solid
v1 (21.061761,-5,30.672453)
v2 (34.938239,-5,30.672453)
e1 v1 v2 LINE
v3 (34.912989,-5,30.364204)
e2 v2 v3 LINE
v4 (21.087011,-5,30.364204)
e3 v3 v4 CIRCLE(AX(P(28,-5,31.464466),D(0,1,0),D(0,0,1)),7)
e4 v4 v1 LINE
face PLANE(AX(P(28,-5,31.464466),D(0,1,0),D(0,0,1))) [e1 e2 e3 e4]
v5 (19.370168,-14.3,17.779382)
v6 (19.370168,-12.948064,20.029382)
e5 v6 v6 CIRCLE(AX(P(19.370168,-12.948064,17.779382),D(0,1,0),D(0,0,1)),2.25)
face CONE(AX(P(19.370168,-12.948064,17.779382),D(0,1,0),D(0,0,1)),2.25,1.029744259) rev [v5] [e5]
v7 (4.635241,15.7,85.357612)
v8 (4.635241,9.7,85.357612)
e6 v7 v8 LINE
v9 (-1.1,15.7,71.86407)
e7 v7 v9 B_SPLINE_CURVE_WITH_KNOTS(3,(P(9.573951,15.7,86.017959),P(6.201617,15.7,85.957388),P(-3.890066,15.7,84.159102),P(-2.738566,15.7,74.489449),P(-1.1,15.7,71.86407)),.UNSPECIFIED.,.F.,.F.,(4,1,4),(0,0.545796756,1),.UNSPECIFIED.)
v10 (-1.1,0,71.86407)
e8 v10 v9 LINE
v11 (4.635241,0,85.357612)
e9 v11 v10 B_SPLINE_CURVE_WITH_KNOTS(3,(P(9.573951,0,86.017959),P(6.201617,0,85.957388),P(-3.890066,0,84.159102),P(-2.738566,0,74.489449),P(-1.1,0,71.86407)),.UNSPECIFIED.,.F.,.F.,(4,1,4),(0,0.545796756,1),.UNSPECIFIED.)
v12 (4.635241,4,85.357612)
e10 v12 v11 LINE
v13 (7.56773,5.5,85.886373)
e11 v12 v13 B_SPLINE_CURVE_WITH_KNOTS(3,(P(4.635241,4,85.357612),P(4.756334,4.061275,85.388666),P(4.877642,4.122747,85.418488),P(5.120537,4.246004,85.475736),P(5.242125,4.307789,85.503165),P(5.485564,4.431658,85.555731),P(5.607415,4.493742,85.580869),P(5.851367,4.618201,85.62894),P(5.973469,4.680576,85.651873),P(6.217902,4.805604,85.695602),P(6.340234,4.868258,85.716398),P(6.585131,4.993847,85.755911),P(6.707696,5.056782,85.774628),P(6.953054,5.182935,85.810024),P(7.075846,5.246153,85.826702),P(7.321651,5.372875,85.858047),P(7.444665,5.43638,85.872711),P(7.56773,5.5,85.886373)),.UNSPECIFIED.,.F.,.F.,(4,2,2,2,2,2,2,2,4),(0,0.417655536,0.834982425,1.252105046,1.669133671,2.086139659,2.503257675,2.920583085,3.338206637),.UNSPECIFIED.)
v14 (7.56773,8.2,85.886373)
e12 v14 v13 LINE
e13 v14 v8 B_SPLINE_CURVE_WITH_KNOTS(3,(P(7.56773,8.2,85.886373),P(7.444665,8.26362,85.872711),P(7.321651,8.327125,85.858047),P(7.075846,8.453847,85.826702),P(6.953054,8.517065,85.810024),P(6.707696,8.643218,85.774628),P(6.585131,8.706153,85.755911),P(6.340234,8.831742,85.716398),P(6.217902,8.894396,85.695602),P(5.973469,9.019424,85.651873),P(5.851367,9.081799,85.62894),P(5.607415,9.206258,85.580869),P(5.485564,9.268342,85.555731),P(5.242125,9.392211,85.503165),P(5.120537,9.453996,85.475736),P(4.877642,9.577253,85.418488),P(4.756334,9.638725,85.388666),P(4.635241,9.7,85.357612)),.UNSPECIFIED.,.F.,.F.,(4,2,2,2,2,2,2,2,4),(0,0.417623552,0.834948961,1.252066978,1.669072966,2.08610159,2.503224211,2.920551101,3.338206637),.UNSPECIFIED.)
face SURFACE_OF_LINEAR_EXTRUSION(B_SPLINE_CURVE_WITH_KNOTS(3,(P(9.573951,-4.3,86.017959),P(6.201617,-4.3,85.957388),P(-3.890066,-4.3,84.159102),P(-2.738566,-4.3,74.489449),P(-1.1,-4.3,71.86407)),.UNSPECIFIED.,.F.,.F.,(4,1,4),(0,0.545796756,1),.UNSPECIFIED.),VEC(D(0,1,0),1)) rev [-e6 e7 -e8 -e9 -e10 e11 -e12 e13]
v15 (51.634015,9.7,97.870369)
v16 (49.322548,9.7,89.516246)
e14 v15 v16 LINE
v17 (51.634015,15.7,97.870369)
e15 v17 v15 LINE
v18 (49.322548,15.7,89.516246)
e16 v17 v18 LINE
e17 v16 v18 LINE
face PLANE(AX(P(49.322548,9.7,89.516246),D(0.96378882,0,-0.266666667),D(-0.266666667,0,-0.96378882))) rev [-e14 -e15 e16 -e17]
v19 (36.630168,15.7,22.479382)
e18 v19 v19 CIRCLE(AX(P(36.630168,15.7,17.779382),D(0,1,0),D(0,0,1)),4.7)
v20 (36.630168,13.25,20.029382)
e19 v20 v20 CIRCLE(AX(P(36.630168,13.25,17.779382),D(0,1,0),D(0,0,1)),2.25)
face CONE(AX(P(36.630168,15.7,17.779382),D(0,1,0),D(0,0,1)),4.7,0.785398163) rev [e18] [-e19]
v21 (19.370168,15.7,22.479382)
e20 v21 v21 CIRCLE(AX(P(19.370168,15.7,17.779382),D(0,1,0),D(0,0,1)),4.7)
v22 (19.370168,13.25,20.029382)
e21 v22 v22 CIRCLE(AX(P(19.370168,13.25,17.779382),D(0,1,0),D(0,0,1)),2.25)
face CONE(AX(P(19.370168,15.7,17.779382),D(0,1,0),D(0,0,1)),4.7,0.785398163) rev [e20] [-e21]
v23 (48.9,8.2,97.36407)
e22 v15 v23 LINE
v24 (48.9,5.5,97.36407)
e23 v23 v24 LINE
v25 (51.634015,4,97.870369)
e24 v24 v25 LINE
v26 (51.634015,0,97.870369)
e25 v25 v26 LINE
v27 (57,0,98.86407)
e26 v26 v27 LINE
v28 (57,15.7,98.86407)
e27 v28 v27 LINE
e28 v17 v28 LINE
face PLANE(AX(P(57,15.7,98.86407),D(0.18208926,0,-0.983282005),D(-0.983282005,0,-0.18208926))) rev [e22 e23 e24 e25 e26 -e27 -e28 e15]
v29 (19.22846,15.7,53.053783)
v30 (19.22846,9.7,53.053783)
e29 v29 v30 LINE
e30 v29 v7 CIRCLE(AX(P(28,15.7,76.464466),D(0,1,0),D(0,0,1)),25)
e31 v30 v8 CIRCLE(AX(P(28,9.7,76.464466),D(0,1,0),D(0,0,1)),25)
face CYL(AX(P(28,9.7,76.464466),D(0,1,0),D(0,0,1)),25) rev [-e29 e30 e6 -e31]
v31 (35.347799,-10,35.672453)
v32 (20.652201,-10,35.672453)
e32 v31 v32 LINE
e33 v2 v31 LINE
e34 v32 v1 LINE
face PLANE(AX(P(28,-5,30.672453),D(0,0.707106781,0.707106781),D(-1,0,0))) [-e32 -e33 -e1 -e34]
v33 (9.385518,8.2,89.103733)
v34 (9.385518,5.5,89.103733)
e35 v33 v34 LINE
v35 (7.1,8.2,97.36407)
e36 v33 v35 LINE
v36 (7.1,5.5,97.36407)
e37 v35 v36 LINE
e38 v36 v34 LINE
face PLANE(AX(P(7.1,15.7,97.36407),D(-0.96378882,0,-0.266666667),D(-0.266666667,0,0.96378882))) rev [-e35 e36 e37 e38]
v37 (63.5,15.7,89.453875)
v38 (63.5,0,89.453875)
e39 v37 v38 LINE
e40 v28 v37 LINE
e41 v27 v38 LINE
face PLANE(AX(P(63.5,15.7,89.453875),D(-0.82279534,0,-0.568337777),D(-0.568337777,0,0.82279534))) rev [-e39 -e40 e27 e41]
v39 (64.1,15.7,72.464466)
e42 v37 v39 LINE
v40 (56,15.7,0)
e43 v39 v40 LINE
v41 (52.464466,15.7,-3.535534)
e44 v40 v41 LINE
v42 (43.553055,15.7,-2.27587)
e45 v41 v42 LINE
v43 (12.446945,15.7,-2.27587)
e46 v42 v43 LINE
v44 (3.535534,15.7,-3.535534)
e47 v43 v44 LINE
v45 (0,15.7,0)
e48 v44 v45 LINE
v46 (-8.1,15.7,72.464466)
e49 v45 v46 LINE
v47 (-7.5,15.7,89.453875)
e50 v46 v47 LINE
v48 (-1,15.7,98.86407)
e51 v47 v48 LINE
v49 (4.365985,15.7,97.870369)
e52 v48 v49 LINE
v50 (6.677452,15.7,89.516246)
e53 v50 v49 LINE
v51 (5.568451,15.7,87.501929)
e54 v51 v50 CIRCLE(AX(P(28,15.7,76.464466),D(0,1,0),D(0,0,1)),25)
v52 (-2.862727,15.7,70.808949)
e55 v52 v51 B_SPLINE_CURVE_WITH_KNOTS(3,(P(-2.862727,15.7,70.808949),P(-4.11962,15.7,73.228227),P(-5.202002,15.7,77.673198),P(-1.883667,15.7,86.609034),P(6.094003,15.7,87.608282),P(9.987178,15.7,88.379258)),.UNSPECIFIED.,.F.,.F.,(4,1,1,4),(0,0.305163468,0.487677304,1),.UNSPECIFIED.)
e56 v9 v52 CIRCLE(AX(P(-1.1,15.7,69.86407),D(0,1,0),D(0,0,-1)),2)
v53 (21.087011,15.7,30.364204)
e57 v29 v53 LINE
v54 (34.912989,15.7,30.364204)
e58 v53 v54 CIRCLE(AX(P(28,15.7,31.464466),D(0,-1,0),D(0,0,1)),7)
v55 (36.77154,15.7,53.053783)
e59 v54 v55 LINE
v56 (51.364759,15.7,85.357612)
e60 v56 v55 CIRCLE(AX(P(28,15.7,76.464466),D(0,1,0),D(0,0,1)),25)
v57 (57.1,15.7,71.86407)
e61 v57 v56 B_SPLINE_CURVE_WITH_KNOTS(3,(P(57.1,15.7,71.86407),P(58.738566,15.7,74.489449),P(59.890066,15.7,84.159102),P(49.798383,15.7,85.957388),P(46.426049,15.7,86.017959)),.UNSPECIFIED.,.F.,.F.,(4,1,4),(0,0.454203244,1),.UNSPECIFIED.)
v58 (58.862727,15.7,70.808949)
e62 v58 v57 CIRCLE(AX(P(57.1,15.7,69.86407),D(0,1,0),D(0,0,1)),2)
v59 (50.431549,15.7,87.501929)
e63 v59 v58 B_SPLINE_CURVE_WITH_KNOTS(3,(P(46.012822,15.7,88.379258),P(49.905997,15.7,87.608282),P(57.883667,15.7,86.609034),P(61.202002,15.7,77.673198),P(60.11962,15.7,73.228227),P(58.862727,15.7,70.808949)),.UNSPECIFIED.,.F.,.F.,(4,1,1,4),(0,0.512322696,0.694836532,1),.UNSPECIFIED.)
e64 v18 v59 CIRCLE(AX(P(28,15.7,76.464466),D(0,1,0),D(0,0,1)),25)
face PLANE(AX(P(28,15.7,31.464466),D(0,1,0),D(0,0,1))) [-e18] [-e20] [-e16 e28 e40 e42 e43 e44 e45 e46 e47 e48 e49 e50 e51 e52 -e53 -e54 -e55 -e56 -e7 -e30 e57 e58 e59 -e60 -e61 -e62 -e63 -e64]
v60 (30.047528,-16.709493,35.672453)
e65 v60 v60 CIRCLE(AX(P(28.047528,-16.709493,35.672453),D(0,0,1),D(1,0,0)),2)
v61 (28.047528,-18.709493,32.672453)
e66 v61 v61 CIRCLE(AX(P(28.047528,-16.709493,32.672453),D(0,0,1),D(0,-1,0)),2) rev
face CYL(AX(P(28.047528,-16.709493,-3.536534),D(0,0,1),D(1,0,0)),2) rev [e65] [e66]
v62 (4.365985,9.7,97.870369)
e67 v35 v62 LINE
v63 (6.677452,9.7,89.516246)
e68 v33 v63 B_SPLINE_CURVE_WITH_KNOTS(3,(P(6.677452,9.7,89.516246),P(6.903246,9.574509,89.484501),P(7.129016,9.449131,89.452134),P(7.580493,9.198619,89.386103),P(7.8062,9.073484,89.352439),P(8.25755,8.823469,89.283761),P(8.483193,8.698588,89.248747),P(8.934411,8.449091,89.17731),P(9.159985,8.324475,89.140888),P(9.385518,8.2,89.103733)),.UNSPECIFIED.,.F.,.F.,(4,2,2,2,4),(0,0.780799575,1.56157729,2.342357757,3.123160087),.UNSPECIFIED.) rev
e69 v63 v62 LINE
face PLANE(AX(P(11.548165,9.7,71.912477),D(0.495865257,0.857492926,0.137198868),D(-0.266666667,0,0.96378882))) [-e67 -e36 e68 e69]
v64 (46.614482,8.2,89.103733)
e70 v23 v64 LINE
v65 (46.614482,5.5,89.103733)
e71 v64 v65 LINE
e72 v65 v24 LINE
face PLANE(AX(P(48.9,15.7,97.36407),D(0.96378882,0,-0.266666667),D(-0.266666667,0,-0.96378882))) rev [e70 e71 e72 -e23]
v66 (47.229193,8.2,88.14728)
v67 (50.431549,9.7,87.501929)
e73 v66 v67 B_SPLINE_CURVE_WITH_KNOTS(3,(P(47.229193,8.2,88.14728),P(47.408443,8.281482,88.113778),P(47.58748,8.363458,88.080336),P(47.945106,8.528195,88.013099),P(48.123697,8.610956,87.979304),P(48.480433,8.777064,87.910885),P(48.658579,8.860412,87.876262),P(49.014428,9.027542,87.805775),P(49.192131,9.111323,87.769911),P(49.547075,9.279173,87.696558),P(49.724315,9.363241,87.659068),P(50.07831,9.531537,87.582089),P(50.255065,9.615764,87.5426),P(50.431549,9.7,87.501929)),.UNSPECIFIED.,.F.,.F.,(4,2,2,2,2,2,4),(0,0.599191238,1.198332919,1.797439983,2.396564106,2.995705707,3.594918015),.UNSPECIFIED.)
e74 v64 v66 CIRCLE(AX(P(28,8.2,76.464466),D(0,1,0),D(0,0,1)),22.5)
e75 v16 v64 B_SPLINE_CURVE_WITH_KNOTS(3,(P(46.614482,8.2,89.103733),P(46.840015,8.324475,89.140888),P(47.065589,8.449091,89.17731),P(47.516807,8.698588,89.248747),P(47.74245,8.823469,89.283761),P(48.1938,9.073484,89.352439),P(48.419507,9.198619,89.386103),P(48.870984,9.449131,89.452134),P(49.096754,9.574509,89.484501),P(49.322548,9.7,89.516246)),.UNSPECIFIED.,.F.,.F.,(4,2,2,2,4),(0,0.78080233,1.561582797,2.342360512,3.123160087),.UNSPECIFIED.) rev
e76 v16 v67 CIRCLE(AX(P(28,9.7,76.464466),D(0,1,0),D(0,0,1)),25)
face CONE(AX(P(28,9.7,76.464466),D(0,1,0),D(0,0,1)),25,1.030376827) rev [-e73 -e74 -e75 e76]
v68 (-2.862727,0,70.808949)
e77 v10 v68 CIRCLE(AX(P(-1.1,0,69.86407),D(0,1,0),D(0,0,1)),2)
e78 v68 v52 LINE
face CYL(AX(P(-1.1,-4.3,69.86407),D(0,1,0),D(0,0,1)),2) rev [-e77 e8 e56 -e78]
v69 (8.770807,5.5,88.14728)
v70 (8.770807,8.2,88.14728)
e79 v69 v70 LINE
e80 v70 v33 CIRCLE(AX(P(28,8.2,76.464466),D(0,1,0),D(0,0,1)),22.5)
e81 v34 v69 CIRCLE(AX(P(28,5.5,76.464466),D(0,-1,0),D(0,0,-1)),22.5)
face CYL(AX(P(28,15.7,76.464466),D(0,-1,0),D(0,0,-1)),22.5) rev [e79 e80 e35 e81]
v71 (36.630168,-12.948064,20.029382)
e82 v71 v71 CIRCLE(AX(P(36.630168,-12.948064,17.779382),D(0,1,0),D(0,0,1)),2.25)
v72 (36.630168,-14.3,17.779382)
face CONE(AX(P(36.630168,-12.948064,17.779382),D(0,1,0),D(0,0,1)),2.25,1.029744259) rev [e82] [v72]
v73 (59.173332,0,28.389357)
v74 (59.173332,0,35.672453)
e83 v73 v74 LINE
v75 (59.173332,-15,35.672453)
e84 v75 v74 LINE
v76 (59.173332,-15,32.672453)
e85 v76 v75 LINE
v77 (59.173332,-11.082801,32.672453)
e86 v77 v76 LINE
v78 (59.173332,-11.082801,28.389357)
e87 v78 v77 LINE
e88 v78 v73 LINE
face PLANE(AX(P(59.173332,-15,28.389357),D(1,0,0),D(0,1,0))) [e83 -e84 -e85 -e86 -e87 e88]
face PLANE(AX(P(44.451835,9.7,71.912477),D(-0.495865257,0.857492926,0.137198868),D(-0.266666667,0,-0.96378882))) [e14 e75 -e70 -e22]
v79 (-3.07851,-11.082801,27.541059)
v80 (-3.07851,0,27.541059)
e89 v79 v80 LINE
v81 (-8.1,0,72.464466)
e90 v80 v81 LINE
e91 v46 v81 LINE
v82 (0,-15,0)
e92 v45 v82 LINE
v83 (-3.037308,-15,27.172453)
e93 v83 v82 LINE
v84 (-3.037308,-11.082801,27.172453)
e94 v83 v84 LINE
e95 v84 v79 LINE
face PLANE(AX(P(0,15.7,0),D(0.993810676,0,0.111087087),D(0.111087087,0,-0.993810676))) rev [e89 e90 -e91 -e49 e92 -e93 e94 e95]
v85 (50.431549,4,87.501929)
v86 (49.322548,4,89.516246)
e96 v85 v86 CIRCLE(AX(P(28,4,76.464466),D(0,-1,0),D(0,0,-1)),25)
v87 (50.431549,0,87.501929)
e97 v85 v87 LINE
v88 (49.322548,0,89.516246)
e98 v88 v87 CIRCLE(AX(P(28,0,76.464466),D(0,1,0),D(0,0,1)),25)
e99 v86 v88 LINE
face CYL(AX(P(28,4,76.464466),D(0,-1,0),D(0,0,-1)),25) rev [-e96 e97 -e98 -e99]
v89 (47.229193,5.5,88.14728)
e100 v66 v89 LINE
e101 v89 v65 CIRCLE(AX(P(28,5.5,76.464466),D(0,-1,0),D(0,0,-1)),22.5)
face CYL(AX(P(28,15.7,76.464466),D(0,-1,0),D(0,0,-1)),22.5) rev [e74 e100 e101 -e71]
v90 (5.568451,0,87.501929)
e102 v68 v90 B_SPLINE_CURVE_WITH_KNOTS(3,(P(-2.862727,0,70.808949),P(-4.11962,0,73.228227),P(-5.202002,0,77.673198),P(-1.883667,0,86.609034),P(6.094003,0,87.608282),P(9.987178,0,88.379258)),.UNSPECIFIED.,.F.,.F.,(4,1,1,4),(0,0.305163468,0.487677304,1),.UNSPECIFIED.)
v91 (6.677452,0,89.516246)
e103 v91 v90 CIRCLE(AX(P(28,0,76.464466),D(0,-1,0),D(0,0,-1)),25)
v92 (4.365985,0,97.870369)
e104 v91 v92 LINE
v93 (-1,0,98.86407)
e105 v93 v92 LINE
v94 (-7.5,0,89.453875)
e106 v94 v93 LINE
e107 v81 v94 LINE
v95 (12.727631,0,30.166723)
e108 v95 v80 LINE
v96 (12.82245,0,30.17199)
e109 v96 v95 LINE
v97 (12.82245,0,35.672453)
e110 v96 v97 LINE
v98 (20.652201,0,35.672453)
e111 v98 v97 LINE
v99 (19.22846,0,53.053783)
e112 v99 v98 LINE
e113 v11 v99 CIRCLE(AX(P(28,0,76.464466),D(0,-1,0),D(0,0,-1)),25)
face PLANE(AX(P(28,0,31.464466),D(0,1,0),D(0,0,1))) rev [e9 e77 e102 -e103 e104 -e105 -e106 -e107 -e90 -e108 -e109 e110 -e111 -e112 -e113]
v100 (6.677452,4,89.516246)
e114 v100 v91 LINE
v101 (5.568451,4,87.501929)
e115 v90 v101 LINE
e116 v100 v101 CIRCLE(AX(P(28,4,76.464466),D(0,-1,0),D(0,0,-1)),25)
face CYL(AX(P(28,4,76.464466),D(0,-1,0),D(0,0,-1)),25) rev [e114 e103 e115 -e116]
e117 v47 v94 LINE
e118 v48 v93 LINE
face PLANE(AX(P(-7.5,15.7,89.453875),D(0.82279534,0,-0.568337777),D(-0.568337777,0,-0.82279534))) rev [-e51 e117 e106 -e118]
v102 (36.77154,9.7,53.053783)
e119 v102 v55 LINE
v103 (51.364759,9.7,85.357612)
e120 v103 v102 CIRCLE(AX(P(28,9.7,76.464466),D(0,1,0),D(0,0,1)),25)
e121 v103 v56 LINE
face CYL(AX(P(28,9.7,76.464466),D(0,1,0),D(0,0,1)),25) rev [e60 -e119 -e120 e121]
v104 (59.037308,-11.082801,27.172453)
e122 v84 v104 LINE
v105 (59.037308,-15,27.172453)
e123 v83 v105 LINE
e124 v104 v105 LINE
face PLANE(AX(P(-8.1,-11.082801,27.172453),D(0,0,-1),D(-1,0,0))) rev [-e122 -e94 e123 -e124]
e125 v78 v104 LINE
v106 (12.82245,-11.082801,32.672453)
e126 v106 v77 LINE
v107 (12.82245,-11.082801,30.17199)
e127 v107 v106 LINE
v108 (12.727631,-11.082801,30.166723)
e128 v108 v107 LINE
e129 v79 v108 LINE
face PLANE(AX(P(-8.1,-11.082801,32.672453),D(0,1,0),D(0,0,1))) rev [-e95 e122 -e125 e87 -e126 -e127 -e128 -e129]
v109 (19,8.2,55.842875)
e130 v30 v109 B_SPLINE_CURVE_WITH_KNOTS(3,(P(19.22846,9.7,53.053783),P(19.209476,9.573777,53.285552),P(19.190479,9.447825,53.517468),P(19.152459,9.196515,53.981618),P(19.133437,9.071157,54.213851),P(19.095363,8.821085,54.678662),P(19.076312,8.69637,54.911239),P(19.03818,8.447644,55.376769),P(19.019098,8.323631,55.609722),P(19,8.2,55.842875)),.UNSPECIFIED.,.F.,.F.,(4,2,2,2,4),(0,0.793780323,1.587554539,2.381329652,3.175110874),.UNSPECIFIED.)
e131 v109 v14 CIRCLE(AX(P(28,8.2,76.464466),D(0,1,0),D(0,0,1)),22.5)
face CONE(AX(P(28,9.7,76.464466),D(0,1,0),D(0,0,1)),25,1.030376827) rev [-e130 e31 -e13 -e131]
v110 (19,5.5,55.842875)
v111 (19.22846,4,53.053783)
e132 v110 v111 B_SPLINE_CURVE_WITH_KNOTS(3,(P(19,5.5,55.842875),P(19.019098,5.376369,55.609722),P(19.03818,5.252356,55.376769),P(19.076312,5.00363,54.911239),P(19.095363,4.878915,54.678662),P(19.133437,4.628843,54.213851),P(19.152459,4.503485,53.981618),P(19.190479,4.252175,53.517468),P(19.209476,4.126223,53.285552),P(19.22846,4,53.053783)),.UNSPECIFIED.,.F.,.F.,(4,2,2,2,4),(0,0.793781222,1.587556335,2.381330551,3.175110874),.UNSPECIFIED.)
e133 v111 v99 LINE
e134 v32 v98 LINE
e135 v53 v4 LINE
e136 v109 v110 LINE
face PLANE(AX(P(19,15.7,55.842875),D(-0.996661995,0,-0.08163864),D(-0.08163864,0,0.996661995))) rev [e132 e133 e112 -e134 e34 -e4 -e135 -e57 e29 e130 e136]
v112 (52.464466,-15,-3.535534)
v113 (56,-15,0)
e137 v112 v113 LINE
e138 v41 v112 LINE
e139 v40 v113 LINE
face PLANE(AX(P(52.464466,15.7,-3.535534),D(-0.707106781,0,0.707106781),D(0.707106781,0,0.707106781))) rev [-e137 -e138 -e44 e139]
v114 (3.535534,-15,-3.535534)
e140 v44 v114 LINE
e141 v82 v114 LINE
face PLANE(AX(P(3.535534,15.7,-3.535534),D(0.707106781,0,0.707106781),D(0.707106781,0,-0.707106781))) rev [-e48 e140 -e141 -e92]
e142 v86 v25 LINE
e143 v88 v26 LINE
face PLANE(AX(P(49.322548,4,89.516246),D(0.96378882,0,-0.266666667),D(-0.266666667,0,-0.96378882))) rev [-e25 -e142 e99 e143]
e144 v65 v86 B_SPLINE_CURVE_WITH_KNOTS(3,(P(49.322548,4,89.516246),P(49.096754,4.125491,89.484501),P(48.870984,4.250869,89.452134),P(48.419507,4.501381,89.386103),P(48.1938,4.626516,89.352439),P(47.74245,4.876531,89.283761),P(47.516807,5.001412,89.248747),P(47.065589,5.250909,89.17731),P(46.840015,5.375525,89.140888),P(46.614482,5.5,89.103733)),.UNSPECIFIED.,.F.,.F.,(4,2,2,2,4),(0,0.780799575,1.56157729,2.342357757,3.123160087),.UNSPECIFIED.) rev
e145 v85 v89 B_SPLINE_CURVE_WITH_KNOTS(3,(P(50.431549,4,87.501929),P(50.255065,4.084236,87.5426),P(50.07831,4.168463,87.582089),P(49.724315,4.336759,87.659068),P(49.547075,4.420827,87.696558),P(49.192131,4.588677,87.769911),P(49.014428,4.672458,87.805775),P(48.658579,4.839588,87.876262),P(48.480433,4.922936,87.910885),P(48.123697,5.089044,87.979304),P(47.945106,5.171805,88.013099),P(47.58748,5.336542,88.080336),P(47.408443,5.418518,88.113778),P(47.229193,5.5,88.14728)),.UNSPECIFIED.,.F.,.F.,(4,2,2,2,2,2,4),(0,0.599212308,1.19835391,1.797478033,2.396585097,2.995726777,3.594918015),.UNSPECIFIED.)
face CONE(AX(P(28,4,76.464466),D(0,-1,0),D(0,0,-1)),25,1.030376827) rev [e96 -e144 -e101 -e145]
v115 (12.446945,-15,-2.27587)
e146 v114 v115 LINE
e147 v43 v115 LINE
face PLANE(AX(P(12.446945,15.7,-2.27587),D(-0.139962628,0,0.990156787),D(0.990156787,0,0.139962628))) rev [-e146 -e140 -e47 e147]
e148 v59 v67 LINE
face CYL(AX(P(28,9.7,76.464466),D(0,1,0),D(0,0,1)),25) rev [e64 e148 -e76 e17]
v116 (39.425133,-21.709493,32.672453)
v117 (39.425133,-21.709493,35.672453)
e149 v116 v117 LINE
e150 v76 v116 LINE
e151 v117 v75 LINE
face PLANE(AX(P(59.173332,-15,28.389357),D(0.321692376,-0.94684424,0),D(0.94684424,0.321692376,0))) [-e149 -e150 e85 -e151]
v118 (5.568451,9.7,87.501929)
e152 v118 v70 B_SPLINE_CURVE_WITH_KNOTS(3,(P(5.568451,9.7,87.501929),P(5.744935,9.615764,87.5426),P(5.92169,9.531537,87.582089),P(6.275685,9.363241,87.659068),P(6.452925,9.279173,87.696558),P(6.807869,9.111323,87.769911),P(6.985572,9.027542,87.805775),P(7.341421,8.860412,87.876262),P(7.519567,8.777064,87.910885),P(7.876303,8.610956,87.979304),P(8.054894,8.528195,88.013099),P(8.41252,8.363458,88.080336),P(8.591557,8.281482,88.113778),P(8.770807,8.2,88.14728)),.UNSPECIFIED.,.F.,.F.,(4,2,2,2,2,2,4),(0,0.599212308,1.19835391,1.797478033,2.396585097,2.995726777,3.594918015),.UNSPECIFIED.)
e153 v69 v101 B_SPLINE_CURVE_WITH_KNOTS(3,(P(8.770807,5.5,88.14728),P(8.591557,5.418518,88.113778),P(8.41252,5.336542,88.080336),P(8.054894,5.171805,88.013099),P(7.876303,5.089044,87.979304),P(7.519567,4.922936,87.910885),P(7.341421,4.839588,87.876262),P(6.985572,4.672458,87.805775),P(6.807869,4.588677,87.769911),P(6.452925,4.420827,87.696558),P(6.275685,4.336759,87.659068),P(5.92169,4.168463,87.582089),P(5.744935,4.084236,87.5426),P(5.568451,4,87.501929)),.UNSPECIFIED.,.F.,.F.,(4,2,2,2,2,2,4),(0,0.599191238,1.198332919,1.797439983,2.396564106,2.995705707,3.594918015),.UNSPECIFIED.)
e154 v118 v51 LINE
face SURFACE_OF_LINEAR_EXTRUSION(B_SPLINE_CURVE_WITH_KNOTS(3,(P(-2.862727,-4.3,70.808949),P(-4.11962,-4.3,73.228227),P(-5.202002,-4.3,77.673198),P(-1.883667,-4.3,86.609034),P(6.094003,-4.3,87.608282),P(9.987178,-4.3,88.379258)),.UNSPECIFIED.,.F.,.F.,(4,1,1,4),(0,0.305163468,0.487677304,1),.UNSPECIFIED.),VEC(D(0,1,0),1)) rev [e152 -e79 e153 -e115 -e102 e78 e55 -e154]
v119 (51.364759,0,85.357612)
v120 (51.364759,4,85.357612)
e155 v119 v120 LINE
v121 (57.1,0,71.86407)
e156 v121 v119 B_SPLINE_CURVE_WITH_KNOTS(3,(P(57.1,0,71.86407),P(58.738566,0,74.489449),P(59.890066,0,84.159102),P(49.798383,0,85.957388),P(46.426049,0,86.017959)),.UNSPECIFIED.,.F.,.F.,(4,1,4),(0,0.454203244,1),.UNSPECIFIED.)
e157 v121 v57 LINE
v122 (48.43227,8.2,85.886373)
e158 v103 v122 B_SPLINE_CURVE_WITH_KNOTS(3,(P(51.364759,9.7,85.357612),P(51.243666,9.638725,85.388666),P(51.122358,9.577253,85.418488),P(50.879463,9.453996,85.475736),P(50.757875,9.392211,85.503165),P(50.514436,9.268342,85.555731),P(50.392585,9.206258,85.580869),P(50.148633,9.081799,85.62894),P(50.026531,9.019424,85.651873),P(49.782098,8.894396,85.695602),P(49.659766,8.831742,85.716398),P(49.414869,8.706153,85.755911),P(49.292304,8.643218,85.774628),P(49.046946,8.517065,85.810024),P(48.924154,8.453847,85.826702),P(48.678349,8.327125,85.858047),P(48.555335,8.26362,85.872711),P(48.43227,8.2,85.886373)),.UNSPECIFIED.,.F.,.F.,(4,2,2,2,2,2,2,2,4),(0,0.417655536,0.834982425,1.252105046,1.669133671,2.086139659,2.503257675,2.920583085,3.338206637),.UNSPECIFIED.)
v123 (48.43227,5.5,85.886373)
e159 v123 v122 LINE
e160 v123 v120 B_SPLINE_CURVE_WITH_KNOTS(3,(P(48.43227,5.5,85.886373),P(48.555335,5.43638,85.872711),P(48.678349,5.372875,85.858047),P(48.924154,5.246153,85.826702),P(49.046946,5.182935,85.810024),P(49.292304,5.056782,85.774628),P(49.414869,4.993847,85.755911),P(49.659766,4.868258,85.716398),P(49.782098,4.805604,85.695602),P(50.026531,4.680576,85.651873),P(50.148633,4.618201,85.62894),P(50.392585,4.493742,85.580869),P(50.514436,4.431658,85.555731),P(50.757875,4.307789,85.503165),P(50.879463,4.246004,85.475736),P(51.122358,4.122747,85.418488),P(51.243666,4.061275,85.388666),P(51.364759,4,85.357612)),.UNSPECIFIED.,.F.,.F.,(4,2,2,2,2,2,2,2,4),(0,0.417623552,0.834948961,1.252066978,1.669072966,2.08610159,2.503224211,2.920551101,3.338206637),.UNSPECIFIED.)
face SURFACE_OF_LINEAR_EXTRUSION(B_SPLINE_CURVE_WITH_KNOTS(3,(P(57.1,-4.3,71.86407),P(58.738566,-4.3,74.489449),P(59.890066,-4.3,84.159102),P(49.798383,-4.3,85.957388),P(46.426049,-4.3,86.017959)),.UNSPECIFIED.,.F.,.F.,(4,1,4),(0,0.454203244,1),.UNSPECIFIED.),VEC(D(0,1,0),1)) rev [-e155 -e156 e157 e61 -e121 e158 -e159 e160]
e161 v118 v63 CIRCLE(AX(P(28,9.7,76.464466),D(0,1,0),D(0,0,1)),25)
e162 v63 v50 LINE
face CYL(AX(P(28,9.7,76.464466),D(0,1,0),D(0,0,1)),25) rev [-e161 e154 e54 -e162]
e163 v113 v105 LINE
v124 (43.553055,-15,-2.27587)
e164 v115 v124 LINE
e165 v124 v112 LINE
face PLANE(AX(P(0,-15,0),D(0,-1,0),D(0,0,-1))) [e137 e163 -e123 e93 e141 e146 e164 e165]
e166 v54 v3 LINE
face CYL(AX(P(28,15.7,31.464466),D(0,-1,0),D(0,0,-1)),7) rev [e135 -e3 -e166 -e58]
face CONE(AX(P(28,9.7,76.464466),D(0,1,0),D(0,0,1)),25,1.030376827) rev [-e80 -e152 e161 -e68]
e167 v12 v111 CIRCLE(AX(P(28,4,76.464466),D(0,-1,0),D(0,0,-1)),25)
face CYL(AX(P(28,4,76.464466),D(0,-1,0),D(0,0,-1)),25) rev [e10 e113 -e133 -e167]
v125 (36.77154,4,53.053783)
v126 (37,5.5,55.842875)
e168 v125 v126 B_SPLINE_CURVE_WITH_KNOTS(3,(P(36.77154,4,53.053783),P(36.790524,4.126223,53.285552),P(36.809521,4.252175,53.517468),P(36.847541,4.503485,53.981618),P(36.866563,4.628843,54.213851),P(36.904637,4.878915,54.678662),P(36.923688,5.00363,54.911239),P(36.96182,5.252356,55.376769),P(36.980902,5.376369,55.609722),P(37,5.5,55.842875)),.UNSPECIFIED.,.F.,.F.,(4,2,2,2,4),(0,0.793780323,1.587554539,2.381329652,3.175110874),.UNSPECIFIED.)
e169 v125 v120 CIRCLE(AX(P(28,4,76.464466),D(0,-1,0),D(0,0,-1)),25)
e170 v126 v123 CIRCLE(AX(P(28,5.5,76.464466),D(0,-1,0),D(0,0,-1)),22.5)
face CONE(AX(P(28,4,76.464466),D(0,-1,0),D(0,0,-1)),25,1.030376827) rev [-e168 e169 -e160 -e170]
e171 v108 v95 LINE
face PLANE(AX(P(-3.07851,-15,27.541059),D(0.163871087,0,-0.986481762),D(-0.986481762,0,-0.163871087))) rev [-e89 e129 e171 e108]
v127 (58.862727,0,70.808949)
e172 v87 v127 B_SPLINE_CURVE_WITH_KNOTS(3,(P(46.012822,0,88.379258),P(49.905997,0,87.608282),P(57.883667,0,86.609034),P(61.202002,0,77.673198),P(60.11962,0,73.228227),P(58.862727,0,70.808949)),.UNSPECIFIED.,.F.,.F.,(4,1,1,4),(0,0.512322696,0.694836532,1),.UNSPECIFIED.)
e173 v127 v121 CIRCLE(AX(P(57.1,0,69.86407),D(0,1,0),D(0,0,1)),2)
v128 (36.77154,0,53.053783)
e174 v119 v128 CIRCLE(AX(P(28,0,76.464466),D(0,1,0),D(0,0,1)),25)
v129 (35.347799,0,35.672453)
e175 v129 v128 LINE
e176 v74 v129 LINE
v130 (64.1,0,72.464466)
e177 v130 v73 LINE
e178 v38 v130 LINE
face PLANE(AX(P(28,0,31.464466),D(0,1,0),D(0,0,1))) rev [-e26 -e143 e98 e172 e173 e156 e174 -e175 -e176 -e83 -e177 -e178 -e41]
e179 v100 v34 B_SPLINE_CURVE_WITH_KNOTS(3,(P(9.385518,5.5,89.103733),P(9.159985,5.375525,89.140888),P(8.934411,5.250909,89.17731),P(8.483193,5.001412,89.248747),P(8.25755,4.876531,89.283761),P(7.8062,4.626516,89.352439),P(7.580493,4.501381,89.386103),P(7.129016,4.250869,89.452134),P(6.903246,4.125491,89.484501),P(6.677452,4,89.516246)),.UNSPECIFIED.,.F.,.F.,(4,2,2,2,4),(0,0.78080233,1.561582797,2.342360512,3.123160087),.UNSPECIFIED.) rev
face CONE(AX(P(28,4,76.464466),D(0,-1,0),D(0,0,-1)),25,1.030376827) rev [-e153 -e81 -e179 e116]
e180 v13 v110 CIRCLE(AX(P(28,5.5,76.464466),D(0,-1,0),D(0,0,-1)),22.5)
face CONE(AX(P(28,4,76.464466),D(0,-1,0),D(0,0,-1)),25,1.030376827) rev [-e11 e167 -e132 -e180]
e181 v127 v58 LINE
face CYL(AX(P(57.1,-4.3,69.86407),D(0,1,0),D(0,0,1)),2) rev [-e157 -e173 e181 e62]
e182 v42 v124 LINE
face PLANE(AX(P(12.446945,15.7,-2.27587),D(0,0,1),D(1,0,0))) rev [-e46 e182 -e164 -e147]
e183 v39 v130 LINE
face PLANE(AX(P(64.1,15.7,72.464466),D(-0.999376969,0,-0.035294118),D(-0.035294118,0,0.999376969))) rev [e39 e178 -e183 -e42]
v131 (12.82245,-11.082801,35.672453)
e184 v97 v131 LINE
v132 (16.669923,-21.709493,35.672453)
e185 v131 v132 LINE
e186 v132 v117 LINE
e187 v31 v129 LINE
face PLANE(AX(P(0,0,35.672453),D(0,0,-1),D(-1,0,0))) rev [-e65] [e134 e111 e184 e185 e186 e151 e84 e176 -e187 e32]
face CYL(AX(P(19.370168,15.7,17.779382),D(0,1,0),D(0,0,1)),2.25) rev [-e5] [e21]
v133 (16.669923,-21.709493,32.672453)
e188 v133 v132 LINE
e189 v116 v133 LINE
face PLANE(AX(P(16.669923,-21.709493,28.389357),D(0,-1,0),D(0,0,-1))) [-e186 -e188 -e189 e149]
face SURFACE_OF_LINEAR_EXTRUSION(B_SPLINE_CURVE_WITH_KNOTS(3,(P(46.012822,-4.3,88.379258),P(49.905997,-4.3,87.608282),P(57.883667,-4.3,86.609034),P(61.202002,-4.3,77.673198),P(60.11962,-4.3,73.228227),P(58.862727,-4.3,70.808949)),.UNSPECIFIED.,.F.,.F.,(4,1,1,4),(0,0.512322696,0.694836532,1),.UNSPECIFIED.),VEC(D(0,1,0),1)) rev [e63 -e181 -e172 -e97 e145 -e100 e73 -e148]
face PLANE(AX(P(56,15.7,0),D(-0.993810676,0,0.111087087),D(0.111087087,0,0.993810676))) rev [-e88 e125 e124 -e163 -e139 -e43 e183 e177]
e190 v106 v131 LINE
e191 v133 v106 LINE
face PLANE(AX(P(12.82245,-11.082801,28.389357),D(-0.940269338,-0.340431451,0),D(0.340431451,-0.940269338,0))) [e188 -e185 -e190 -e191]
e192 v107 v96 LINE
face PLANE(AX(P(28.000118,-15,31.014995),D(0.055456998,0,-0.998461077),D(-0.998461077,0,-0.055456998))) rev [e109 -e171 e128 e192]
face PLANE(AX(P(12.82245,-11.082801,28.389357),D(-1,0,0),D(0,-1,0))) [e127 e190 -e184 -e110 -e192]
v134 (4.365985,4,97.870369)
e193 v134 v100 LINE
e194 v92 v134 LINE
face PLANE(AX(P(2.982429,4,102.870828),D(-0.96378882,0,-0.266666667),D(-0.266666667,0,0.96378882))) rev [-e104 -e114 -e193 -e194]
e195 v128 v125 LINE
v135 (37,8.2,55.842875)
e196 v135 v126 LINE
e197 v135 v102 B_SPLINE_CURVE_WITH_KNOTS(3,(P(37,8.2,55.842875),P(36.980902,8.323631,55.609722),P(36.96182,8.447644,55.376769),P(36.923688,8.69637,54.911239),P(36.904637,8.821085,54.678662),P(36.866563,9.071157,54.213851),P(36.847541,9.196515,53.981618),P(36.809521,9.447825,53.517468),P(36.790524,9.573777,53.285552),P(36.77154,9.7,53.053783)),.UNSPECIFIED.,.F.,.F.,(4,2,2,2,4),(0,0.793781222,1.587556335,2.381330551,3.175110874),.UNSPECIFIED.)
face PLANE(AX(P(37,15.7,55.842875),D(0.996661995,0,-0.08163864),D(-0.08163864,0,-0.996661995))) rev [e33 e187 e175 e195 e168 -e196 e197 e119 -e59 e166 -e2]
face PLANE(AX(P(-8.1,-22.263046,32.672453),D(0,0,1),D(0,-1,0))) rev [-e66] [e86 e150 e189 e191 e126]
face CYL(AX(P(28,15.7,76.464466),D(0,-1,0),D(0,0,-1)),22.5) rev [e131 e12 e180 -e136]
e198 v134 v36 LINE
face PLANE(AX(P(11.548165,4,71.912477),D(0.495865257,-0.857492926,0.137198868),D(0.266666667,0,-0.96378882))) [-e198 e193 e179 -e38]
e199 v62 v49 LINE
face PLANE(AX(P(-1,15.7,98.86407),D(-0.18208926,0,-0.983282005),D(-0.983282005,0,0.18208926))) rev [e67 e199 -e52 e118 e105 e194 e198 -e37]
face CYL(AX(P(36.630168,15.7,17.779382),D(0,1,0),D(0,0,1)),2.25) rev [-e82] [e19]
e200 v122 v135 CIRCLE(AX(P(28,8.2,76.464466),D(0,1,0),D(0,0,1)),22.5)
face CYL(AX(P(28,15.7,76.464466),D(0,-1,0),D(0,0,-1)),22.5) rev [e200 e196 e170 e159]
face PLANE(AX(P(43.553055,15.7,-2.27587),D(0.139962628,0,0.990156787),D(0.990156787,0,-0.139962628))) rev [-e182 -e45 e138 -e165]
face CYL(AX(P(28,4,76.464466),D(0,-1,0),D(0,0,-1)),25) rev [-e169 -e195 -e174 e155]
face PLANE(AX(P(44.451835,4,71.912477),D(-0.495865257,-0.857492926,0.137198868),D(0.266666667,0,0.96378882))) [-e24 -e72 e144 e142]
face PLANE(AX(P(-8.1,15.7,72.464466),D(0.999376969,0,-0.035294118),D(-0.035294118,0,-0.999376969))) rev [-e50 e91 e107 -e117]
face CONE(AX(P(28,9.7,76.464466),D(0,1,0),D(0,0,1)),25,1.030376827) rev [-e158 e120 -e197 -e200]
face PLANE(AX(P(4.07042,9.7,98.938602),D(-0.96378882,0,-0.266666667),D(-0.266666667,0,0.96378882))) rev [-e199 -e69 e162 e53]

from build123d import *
from OCP.BRepFilletAPI import BRepFilletAPI_MakeChamfer

# Parameters (mm, degrees)
EXTRUDE_1_DEPTH                                 = 15.7
CUT_EXTRUDE_5_DEPTH                             = 6
CUT_EXTRUDE_START                               = -4
CUT_EXTRUDE_6_DEPTH                             = 4
CHAMFER_2_SIZE                                  = 2.5
CHAMFER_2_SIZE_2                                = 1.5
CHAMFER_3_SIZE                                  = 2.5
CHAMFER_3_SIZE_2                                = 1.5
CHAMFER_4_SIZE                                  = 2.5
CHAMFER_4_SIZE_2                                = 1.5
CHAMFER_5_SIZE                                  = 1.5
CHAMFER_5_SIZE_2                                = 2.5
CUT_EXTRUDE_7_DEPTH                             = 20
BOSS_EXTRUDE2_DEPTH                             = 15
CSK_FOR_M4_FLAT_HEAD_MACHINE_SCREW1_D           = 4.5
CSK_FOR_M4_FLAT_HEAD_MACHINE_SCREW1_DEPTH       = 28.648063607
CSK_FOR_M4_FLAT_HEAD_MACHINE_SCREW1_CSINK_D     = 9.4
CSK_FOR_M4_FLAT_HEAD_MACHINE_SCREW1_CSINK_ANGLE = 90
CSK_FOR_M4_FLAT_HEAD_MACHINE_SCREW1_TIP         = 1.351936393
BOSS_EXTRUDE3_DEPTH                             = 3
BOSS_EXTRUDE3_DEPTH_BACK                        = 4.283096
CUT_EXTRUDE1_DEPTH                              = 122.536445899
CUT_EXTRUDE2_START                              = -5
CUT_EXTRUDE2_DEPTH                              = 5
CHAMFER1_SIZE                                   = 5
CUT_EXTRUDE3_REACH                              = 94.592
SKETCH9_R                                       = 2


with BuildPart() as part:
    # Эскиз1 → Бобышка-Вытянуть1 (new body)
    with BuildSketch(Plane(origin=(0, 0, 0), x_dir=(1, 0, 0), z_dir=(0, 1, 0))):
        with BuildLine():
            Line((19, -55.842875467), (21.087010541, -30.364203971))
            ThreePointArc((21.087010541, -30.364203971), (28, -24.464466094), (34.912989459, -30.364203971))
            Line((34.912989459, -30.364203971), (37, -55.842875467))
            ThreePointArc((37, -55.842875467), (49.615065571, -70.216351148), (46.614482007, -89.103732671))
            Line((46.614482007, -89.103732671), (48.9, -97.364070254))
            Line((48.9, -97.364070254), (57, -98.864070254))
            Line((57, -98.864070254), (63.5, -89.453874559))
            Line((63.5, -89.453874559), (64.1, -72.464466094))
            Line((64.1, -72.464466094), (56, 0))
            Line((56, 0), (52.464466094, 3.535533906))
            Line((52.464466094, 3.535533906), (43.553055011, 2.275870258))
            Line((43.553055011, 2.275870258), (12.446944989, 2.275870258))
            Line((12.446944989, 2.275870258), (3.535533906, 3.535533906))
            Line((3.535533906, 3.535533906), (0, 0))
            Line((0, 0), (-8.1, -72.464466094))
            Line((-8.1, -72.464466094), (-7.5, -89.453874559))
            Line((-7.5, -89.453874559), (-1, -98.864070254))
            Line((-1, -98.864070254), (7.1, -97.364070254))
            Line((7.1, -97.364070254), (9.385517993, -89.103732671))
            ThreePointArc((9.385517993, -89.103732671), (6.384934429, -70.216351148), (19, -55.842875467))
        make_face()
    extrude(amount=EXTRUDE_1_DEPTH)

    # Эскиз9 → Вырез-Вытянуть5 (cut)
    with BuildSketch(Plane(origin=(0, 15.7, 0), x_dir=(1, 0, 0), z_dir=(0, 1, 0))):
        with BuildLine():
            Line((4.070420212, -98.938601985), (6.67745221, -89.516245887))
            ThreePointArc((6.67745221, -89.516245887), (28, -51.464466094), (49.32254779, -89.516245887))
            Line((49.32254779, -89.516245887), (51.928879153, -98.936069744))
            Line((51.928879153, -98.936069744), (4.070420212, -98.938601985))
        make_face()
    extrude(amount=-CUT_EXTRUDE_5_DEPTH, mode=Mode.SUBTRACT)

    # Эскиз10 → Вырез-Вытянуть6 (cut)
    with BuildSketch(Plane.XZ.offset(CUT_EXTRUDE_START)):
        with BuildLine():
            Line((49.32254779, 89.516245887), (52.714892846, 101.77688678))
            Line((52.714892846, 101.77688678), (2.982429051, 102.870828422))
            Line((2.982429051, 102.870828422), (6.67745221, 89.516245887))
            ThreePointArc((6.67745221, 89.516245887), (28, 51.464466094), (49.32254779, 89.516245887))
        make_face()
    extrude(amount=CUT_EXTRUDE_6_DEPTH, mode=Mode.SUBTRACT)

    # Фаска2
    chamfer_2_edges_1 = [part.edges().sort_by_distance(p)[0] for p in [
        (8.242758997, 9.7, 93.233901463),
    ]]
    chamfer_2_side_1 = [part.faces().sort_by_distance(p)[0] for p in [
        (8.213845332, 9.7, 93.225901463),
    ]]
    chamfer_2_edges_2 = [part.edges().sort_by_distance(p)[0] for p in [
        (6.384934429, 9.7, 70.216351148),
    ]]
    chamfer_2_side_2 = [part.faces().sort_by_distance(p)[0] for p in [
        (6.356114342, 9.7, 70.208020328),
    ]]
    chamfer_2 = BRepFilletAPI_MakeChamfer(part.part.solid().wrapped)
    for e in chamfer_2_edges_1:
        chamfer_2.Add(CHAMFER_2_SIZE - 0.0001, CHAMFER_2_SIZE_2 - 0.0001, e.wrapped, chamfer_2_side_1[0].wrapped)
    for e in chamfer_2_edges_2:
        chamfer_2.Add(CHAMFER_2_SIZE - 0.0001, CHAMFER_2_SIZE_2 - 0.0001, e.wrapped, chamfer_2_side_2[0].wrapped)
    add(Compound.cast(chamfer_2.Shape()), mode=Mode.REPLACE)  # a hair under: the kernel refuses the full size

    # Фаска3
    chamfer_3_edges_1 = [part.edges().sort_by_distance(p)[0] for p in [
        (8.242758997, 4, 93.233901463),
    ]]
    chamfer_3_side_1 = [part.faces().sort_by_distance(p)[0] for p in [
        (8.213845332, 4, 93.225901463),
    ]]
    chamfer_3_edges_2 = [part.edges().sort_by_distance(p)[0] for p in [
        (6.384934429, 4, 70.216351148),
    ]]
    chamfer_3_side_2 = [part.faces().sort_by_distance(p)[0] for p in [
        (6.384934429, 4.03, 70.216351148),
    ]]
    chamfer_3 = BRepFilletAPI_MakeChamfer(part.part.solid().wrapped)
    for e in chamfer_3_edges_1:
        chamfer_3.Add(CHAMFER_3_SIZE - 0.0001, CHAMFER_3_SIZE_2 - 0.0001, e.wrapped, chamfer_3_side_1[0].wrapped)
    for e in chamfer_3_edges_2:
        chamfer_3.Add(CHAMFER_3_SIZE_2 - 0.0001, CHAMFER_3_SIZE - 0.0001, e.wrapped, chamfer_3_side_2[0].wrapped)
    add(Compound.cast(chamfer_3.Shape()), mode=Mode.REPLACE)  # a hair under: the kernel refuses the full size

    # Фаска4
    chamfer_4_edges_1 = [part.edges().sort_by_distance(p)[0] for p in [
        (47.757241003, 9.7, 93.233901463),
    ]]
    chamfer_4_side_1 = [part.faces().sort_by_distance(p)[0] for p in [
        (47.786154668, 9.7, 93.225901463),
    ]]
    chamfer_4_edges_2 = [part.edges().sort_by_distance(p)[0] for p in [
        (49.615065571, 9.7, 70.216351148),
    ]]
    chamfer_4_side_2 = [part.faces().sort_by_distance(p)[0] for p in [
        (49.643885658, 9.7, 70.208020328),
    ]]
    chamfer_4 = BRepFilletAPI_MakeChamfer(part.part.solid().wrapped)
    for e in chamfer_4_edges_1:
        chamfer_4.Add(CHAMFER_4_SIZE - 0.0001, CHAMFER_4_SIZE_2 - 0.0001, e.wrapped, chamfer_4_side_1[0].wrapped)
    for e in chamfer_4_edges_2:
        chamfer_4.Add(CHAMFER_4_SIZE - 0.0001, CHAMFER_4_SIZE_2 - 0.0001, e.wrapped, chamfer_4_side_2[0].wrapped)
    add(Compound.cast(chamfer_4.Shape()), mode=Mode.REPLACE)  # a hair under: the kernel refuses the full size

    # Фаска5
    chamfer_5_edges_1 = [part.edges().sort_by_distance(p)[0] for p in [
        (47.757241003, 4, 93.233901463),
    ]]
    chamfer_5_side_1 = [part.faces().sort_by_distance(p)[0] for p in [
        (47.757241003, 4.03, 93.233901463),
    ]]
    chamfer_5_edges_2 = [part.edges().sort_by_distance(p)[0] for p in [
        (49.615065571, 4, 70.216351148),
    ]]
    chamfer_5_side_2 = [part.faces().sort_by_distance(p)[0] for p in [
        (49.643885658, 4, 70.208020328),
    ]]
    chamfer_5 = BRepFilletAPI_MakeChamfer(part.part.solid().wrapped)
    for e in chamfer_5_edges_1:
        chamfer_5.Add(CHAMFER_5_SIZE - 0.0001, CHAMFER_5_SIZE_2 - 0.0001, e.wrapped, chamfer_5_side_1[0].wrapped)
    for e in chamfer_5_edges_2:
        chamfer_5.Add(CHAMFER_5_SIZE_2 - 0.0001, CHAMFER_5_SIZE - 0.0001, e.wrapped, chamfer_5_side_2[0].wrapped)
    add(Compound.cast(chamfer_5.Shape()), mode=Mode.REPLACE)  # a hair under: the kernel refuses the full size

    # Эскиз11 → Вырез-Вытянуть7 (cut)
    with BuildSketch(Plane(origin=(0, 15.7, 0), x_dir=(1, 0, 0), z_dir=(0, 1, 0))):
        with BuildLine():
            Line((46.426049473, -86.017959352), (46.012822205, -88.379258027))
            add(Edge.make_bspline(
                [(58.862726543, -70.808948625), (60.119619749, -73.228227212), (61.202001727, -77.673197621), (57.883666669, -86.609034293), (49.905997231, -87.608281842), (46.012822205, -88.379258027)],
                knots=[0, 0, 0, 0, 0.305163468, 0.487677304, 1, 1, 1, 1], degree=3))
            ThreePointArc((58.862726543, -70.808948625), (56.072808864, -68.148005462), (57.1, -71.864070254))
            add(Edge.make_bspline(
                [(57.1, -71.864070254), (58.73856603, -74.489449168), (59.890065943, -84.15910166), (49.798382886, -85.957388163), (46.426049473, -86.017959352)],
                knots=[0, 0, 0, 0, 0.454203244, 1, 1, 1, 1], degree=3))
        make_face()
        with BuildLine():
            Line((9.573950527, -86.017959352), (9.987177795, -88.379258027))
            add(Edge.make_bspline(
                [(-2.862726543, -70.808948625), (-4.119619749, -73.228227212), (-5.202001727, -77.673197621), (-1.883666669, -86.609034293), (6.094002769, -87.608281842), (9.987177795, -88.379258027)],
                knots=[0, 0, 0, 0, 0.305163468, 0.487677304, 1, 1, 1, 1], degree=3))
            ThreePointArc((-2.862726543, -70.808948625), (-0.072808864, -68.148005462), (-1.1, -71.864070254))
            add(Edge.make_bspline(
                [(-1.1, -71.864070254), (-2.73856603, -74.489449168), (-3.890065943, -84.15910166), (6.201617114, -85.957388163), (9.573950527, -86.017959352)],
                knots=[0, 0, 0, 0, 0.454203244, 1, 1, 1, 1], degree=3))
        make_face()
    extrude(amount=-CUT_EXTRUDE_7_DEPTH, mode=Mode.SUBTRACT)

    # Sketch5 → Boss-Extrude2 (add)
    with BuildSketch(Plane.XZ):
        Polygon((3.535533906, -3.535533906), (0, 0), (-3.078509959, 27.541059326), (12.727631466, 30.166723248), (28.000118409, 31.014994944), (59.173331778, 28.389357167), (56, 0), (52.464466094, -3.535533906), (43.553055011, -2.275870258), (12.446944989, -2.275870258), align=None)
    extrude(amount=BOSS_EXTRUDE2_DEPTH)

    # CSK for M4 Flat Head Machine Screw1
    with Locations(Plane(origin=(19.370167772, 15.7, 17.779382006), x_dir=(0, 0, 1), z_dir=(0, 1, 0))):
        with Locations((0, 0), (0, 17.26)):
            CounterSinkHole(CSK_FOR_M4_FLAT_HEAD_MACHINE_SCREW1_D / 2, CSK_FOR_M4_FLAT_HEAD_MACHINE_SCREW1_CSINK_D / 2, depth=CSK_FOR_M4_FLAT_HEAD_MACHINE_SCREW1_DEPTH, counter_sink_angle=CSK_FOR_M4_FLAT_HEAD_MACHINE_SCREW1_CSINK_ANGLE)
            with Locations((0, 0, -(CSK_FOR_M4_FLAT_HEAD_MACHINE_SCREW1_DEPTH + CSK_FOR_M4_FLAT_HEAD_MACHINE_SCREW1_TIP / 2))):  # 118° drill point
                Cone(0, CSK_FOR_M4_FLAT_HEAD_MACHINE_SCREW1_D / 2, CSK_FOR_M4_FLAT_HEAD_MACHINE_SCREW1_TIP, mode=Mode.SUBTRACT)

    # Sketch6 → Boss-Extrude3 (add, two sides: drawn at the far end of the back side and taken through both)
    with BuildSketch(Plane.XY.offset(32.6724529).offset(-BOSS_EXTRUDE3_DEPTH_BACK)):
        Polygon((12.822450363, -11.082801181), (12.822450363, 0), (59.173331778, 0), (59.173331778, -15), (39.425133125, -21.709493147), (16.66992259, -21.709493147), align=None)
    extrude(amount=BOSS_EXTRUDE3_DEPTH + BOSS_EXTRUDE3_DEPTH_BACK)

    # Sketch7 → Cut-Extrude1 (cut, through all)
    with BuildSketch(Plane(origin=(59.173331778, 0, 0), x_dir=(0, 0, -1), z_dir=(1, 0, 0))):
        Polygon((-32.6724529, -22.263045792), (-32.6724529, -12.082801181), (-32.6724529, -11.082801181), (-31.6724529, -11.082801181), (-27.1724529, -11.082801181), (-27.1724529, -22.263045792), align=None)
    extrude(amount=-CUT_EXTRUDE1_DEPTH, mode=Mode.SUBTRACT)

    # Sketch8 → Cut-Extrude2 (cut)
    with BuildSketch(Plane(origin=(0, 0, 0), x_dir=(1, 0, 0), z_dir=(0, 1, 0)).offset(CUT_EXTRUDE2_START)):
        with BuildLine():
            Line((35.347799079, -35.6724529), (34.912989459, -30.364203971))
            ThreePointArc((34.912989459, -30.364203971), (28, -24.464466094), (21.087010541, -30.364203971))
            Line((21.087010541, -30.364203971), (20.652200921, -35.6724529))
            Line((20.652200921, -35.6724529), (35.347799079, -35.6724529))
        make_face()
    extrude(amount=CUT_EXTRUDE2_DEPTH, mode=Mode.SUBTRACT)

    # Chamfer1
    chamfer1_edges = [part.edges().sort_by_distance(p)[0] for p in [
        (28, -5, 35.6724529),
    ]]
    chamfer(chamfer1_edges, length=CHAMFER1_SIZE)

    # Sketch9 → Cut-Extrude3 (cut, up to next)
    with BuildSketch(Plane.XY.offset(35.6724529), mode=Mode.PRIVATE) as cut_extrude3_sk1:
        with Locations((28.047527858, -16.709493147)):
            Circle(SKETCH9_R)
    cut_extrude3_tool1 = extrude(cut_extrude3_sk1.sketch, amount=-CUT_EXTRUDE3_REACH, mode=Mode.PRIVATE) & part.part
    add(cut_extrude3_tool1.solids().sort_by_distance((28.047528, -16.709493, 35.672453))[0], mode=Mode.SUBTRACT)


solid = part.part
